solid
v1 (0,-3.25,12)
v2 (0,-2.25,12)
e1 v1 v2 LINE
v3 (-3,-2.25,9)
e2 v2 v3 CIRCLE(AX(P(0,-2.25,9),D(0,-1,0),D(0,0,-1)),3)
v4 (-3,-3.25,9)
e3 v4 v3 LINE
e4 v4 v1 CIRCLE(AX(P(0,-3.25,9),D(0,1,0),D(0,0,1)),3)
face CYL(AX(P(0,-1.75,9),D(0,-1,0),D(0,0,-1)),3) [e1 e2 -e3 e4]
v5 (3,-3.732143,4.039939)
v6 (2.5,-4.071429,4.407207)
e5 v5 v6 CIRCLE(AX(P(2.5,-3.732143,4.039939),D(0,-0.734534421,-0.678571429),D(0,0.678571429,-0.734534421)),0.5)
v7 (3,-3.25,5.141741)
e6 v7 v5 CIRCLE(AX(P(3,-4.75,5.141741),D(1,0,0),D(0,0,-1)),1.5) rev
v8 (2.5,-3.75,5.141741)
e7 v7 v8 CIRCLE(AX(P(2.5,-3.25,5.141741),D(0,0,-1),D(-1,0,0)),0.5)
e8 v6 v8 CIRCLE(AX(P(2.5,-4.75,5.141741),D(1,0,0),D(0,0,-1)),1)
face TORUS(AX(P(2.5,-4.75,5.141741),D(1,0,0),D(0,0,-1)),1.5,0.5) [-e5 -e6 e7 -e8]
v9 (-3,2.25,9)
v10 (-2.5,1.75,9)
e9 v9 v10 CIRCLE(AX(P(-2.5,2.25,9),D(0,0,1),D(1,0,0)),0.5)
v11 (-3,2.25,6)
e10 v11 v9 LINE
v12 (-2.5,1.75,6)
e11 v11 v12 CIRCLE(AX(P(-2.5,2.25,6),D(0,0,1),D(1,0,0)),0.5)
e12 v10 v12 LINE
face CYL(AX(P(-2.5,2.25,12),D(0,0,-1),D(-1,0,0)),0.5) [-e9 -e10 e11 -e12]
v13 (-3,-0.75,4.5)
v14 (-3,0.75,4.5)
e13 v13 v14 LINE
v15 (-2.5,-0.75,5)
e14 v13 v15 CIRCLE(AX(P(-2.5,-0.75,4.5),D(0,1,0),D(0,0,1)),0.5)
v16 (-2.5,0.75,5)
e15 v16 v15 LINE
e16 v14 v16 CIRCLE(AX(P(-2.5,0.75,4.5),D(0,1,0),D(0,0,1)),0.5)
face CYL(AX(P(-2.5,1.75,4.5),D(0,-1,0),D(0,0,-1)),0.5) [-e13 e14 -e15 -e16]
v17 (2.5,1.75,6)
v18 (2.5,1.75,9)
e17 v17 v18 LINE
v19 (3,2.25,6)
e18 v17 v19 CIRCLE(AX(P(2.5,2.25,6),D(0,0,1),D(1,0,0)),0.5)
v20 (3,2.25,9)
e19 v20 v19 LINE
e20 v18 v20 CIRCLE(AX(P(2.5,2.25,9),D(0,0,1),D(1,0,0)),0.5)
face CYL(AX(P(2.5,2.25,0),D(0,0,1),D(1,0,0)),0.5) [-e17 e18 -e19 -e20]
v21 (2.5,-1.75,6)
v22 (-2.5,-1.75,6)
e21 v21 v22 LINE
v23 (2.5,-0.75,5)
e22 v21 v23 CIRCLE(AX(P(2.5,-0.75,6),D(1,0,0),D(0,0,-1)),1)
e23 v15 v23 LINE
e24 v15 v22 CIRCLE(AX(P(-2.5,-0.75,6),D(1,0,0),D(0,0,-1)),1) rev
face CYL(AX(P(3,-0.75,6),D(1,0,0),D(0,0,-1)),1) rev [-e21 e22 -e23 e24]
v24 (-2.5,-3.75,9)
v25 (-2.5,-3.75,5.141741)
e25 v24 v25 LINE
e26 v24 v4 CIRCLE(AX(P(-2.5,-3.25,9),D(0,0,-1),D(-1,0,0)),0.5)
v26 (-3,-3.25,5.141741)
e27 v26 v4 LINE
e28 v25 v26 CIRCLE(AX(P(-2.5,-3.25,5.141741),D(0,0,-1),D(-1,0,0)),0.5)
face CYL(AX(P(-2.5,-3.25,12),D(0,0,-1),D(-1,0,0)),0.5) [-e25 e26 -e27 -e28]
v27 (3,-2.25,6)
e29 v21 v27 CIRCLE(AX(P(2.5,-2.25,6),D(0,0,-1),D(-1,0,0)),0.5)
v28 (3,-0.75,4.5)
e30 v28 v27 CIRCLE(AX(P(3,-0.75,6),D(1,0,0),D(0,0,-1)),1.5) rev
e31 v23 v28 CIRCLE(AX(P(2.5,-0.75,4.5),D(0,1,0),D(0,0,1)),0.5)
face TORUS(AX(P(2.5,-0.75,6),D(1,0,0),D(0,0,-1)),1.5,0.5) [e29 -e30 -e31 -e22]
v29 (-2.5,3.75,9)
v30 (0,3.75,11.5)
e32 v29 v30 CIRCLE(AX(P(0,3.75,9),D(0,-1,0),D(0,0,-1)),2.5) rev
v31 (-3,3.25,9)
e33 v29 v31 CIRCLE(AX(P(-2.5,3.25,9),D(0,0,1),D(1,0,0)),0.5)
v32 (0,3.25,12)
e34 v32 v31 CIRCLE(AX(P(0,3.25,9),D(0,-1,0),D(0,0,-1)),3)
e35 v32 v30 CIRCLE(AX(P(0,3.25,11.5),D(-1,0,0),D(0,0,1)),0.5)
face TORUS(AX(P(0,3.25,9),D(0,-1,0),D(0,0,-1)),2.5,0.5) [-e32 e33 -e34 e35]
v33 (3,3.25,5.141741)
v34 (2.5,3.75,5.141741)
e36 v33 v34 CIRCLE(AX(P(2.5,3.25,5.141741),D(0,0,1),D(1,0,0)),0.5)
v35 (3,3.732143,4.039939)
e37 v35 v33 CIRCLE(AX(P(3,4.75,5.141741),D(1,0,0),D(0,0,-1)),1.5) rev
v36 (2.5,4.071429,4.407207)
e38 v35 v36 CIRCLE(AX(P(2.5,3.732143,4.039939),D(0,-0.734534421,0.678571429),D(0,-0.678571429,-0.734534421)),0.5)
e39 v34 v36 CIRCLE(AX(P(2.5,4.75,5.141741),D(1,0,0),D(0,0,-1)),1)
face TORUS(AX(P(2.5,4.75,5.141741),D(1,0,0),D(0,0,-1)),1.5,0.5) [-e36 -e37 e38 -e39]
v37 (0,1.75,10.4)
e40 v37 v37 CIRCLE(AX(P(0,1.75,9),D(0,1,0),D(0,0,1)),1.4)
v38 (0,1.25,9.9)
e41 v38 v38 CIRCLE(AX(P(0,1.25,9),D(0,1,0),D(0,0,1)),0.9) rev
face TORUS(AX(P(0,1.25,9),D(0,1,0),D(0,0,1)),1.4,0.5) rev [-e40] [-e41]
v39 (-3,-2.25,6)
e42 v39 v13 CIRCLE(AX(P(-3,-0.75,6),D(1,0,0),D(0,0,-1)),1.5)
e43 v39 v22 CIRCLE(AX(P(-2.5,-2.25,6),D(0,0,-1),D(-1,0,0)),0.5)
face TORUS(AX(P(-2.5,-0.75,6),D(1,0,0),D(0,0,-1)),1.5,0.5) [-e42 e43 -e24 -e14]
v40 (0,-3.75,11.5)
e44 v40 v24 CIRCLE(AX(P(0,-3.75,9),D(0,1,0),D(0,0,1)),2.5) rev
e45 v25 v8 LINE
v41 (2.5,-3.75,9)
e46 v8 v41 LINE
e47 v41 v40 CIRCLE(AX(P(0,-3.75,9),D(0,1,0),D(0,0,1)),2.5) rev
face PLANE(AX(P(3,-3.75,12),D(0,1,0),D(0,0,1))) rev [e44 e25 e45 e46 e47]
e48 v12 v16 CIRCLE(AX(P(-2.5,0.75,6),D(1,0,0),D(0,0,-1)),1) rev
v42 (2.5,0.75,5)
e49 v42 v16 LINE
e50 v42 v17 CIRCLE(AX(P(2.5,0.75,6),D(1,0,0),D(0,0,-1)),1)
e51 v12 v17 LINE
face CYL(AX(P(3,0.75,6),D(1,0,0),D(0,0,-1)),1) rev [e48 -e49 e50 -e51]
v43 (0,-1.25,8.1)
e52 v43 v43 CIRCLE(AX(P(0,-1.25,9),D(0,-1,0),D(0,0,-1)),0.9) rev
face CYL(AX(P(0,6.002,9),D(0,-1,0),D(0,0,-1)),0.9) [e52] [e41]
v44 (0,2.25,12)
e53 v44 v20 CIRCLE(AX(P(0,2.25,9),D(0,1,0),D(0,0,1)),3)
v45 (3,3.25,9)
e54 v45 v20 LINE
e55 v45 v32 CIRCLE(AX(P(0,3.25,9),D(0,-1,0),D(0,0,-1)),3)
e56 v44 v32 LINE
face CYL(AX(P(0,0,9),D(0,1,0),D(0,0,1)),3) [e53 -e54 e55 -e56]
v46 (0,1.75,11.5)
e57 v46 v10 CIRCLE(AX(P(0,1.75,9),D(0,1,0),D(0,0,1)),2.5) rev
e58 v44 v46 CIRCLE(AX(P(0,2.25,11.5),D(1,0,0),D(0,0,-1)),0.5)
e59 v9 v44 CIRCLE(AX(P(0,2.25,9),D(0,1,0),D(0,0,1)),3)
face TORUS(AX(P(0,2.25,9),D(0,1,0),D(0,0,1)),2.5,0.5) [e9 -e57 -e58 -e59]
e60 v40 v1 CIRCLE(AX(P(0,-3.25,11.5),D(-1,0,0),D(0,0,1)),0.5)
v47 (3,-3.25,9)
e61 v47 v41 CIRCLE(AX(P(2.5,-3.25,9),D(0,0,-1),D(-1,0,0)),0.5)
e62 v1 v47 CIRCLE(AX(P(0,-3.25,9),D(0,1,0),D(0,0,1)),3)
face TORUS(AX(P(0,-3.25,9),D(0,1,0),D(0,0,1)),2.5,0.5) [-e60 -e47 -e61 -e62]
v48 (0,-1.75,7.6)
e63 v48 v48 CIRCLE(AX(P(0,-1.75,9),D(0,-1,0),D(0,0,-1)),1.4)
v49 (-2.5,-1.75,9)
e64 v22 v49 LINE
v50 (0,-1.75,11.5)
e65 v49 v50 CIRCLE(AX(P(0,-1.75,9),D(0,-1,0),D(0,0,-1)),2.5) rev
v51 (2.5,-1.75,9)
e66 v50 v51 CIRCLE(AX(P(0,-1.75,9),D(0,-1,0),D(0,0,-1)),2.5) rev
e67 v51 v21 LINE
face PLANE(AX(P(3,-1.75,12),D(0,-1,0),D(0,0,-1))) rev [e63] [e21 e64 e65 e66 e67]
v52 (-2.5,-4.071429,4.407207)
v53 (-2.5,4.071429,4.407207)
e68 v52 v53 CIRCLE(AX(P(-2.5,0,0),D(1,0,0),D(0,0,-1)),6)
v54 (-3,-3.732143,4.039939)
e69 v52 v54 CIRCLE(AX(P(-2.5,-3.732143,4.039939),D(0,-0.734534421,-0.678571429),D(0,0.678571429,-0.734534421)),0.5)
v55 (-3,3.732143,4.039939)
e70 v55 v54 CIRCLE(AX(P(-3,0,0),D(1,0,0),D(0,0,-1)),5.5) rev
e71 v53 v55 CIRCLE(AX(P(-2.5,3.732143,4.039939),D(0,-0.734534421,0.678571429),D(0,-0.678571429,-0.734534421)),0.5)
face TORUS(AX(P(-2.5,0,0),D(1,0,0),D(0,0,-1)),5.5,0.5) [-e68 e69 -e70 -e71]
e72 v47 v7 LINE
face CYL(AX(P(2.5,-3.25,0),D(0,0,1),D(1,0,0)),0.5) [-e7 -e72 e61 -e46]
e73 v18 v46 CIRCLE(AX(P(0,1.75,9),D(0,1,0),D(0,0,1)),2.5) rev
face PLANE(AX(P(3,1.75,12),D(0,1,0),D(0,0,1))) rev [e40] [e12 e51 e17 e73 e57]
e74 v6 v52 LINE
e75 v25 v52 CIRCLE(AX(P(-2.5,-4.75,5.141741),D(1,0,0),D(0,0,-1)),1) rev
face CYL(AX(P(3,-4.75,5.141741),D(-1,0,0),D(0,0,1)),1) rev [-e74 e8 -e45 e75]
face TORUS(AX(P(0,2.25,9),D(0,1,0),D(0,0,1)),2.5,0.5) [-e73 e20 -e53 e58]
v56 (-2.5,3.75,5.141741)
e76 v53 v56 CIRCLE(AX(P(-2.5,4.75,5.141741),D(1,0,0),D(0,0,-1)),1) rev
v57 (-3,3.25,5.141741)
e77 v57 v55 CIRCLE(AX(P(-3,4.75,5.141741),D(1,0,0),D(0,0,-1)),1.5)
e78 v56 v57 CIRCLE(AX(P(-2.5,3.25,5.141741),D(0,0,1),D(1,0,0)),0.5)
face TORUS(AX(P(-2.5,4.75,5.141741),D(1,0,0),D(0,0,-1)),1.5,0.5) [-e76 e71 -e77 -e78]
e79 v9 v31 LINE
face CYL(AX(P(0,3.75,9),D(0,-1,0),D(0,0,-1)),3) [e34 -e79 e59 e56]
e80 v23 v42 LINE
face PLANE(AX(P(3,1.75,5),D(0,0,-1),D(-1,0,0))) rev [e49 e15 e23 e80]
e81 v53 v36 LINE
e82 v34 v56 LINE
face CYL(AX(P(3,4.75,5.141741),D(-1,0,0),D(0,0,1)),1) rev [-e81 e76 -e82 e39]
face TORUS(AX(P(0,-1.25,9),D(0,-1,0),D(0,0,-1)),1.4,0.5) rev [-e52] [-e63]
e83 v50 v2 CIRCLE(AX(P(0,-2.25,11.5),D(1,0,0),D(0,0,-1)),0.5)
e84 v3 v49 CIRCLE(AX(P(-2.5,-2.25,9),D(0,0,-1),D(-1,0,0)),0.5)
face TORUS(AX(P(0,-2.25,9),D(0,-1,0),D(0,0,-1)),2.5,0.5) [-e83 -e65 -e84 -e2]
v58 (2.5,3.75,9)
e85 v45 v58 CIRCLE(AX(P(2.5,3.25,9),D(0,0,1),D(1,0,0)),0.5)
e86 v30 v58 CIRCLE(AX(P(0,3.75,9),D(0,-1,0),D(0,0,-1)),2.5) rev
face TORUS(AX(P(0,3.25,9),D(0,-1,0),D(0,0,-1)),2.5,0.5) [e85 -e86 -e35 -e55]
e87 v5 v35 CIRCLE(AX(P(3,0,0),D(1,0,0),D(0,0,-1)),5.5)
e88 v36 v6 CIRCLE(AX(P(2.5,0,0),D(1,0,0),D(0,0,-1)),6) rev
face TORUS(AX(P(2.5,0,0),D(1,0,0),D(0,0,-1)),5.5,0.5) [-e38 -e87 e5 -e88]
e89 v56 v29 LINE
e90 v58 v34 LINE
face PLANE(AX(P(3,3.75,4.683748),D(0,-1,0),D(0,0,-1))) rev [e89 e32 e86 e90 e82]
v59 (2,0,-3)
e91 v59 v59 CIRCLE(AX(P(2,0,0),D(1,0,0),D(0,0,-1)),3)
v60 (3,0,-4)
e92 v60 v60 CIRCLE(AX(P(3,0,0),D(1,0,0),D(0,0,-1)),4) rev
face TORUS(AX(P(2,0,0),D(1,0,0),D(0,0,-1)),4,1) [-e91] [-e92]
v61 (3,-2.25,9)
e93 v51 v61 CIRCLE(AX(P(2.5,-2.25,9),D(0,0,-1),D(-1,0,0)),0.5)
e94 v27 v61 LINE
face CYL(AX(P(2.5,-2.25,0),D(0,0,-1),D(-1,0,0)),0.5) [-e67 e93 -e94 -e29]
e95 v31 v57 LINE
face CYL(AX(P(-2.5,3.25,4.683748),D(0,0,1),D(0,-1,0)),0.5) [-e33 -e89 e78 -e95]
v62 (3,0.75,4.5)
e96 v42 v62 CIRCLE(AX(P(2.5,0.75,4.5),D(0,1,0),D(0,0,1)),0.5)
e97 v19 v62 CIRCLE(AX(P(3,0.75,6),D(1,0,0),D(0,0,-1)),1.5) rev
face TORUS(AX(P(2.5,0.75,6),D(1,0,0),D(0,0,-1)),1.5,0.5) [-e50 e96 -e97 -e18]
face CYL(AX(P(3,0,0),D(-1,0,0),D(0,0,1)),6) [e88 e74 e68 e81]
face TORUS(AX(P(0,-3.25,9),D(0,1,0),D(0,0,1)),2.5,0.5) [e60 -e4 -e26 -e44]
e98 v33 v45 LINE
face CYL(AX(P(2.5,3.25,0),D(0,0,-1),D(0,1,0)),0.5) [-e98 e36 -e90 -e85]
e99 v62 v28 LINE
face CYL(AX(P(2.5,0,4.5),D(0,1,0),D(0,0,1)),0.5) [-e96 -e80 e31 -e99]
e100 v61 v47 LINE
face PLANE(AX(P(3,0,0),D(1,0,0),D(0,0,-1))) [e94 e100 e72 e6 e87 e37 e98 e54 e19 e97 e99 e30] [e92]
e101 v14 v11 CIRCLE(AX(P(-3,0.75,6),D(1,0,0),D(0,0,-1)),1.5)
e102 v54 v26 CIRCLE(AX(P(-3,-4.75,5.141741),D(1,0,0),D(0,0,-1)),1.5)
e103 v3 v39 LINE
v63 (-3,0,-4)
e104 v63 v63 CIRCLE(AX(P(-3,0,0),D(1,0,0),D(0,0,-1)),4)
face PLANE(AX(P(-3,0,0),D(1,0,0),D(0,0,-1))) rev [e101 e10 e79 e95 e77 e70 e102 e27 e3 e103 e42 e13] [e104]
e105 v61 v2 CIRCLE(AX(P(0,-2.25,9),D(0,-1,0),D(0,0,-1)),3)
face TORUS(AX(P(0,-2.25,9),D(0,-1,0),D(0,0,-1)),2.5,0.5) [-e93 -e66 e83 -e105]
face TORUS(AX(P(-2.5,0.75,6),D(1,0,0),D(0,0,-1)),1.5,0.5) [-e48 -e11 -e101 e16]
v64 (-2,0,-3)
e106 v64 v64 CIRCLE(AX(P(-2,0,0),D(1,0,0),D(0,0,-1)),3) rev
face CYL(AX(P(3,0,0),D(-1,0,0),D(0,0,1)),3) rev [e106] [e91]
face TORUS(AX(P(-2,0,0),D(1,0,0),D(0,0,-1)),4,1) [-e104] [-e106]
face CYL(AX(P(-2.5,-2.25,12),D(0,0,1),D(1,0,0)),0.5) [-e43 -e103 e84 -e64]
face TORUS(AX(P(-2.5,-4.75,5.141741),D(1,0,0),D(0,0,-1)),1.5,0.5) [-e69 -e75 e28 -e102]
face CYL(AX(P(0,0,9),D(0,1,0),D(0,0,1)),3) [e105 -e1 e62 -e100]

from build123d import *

# Parameters (mm, degrees)
SKETCH_1_R      = 3
EXTRUDE_1_DEPTH = 3
FILLET_1_R      = 1
EXTRUDE_2_REACH = 16.597
SKETCH_2_R      = 0.9
FILLET_3_R      = 1
FILLET_2_R      = 3
FILLET_4_R      = 0.5
FILLET_5_R      = 0.5


with BuildPart() as part:
    # 草图1 → 凸台-拉伸1 (new, symmetric)
    with BuildSketch(Plane(origin=(0, 0, 0), x_dir=(0, 0, -1), z_dir=(1, 0, 0))):
        with BuildLine():
            Line((-4.683748499, 3.75), (-12, 3.75))
            Line((-12, 3.75), (-12, 1.75))
            Line((-12, 1.75), (-5, 1.75))
            Line((-5, 1.75), (-5, -1.75))
            Line((-5, -1.75), (-12, -1.75))
            Line((-12, -1.75), (-12, -3.75))
            Line((-12, -3.75), (-4.683748499, -3.75))
            ThreePointArc((-4.683748499, -3.75), (6, 0), (-4.683748499, 3.75))
        make_face()
        Circle(SKETCH_1_R, mode=Mode.SUBTRACT)
    extrude(amount=EXTRUDE_1_DEPTH, both=True)

    # 圆角1
    fillet_1_edges = [part.edges().sort_by_distance(p)[0] for p in [
        (0, -3.75, 4.683748499),
        (0, -1.75, 5),
        (0, 1.75, 5),
        (0, 3.75, 4.683748499),
    ]]
    fillet(fillet_1_edges, radius=FILLET_1_R)

    # 草图2 → 凸台-拉伸2 (add, up to next)
    with BuildSketch(Plane(origin=(0, -1.75, 0), x_dir=(1, 0, 0), z_dir=(0, 1, 0)), mode=Mode.PRIVATE) as extrude_2_sk1:
        with Locations(Location((0, -9, 0), (0, 0, 90))):
            Circle(SKETCH_2_R)
    extrude_2_tool1 = extrude(extrude_2_sk1.sketch, amount=EXTRUDE_2_REACH, mode=Mode.PRIVATE) - part.part
    add(extrude_2_tool1.solids().sort_by_distance((0, -1.75, 9))[0])

    # 圆角3
    fillet_3_edges = [part.edges().sort_by_distance(p)[0] for p in [
        (-3, 0, 3),
        (3, 0, 3),
    ]]
    fillet(fillet_3_edges, radius=FILLET_3_R)

    # 圆角2
    fillet_2_edges = [part.edges().sort_by_distance(p)[0] for p in [
        (-3, -2.75, 12),
        (-3, 2.75, 12),
        (3, -2.75, 12),
        (3, 2.75, 12),
    ]]
    fillet(fillet_2_edges, radius=FILLET_2_R - 0.0001)  # a hair under: the kernel refuses the full size

    # 圆角4
    fillet_4_edges = [part.edges().sort_by_distance(p)[0] for p in [
        (0, -1.75, 9.9),
        (0, 1.75, 9.9),
    ]]
    fillet(fillet_4_edges, radius=FILLET_4_R)

    # 圆角5
    fillet_5_edges = [part.edges().sort_by_distance(p)[0] for p in [
        (-3, 3.75, 7.070920475),
        (3, 3.75, 7.070920475),
        (-3, 0, -6),
        (3, 0, -6),
        (-3, -1.75, 7.50005),
        (3, -1.75, 7.50005),
        (-3, 0, 5),
        (3, 0, 5),
        (-3, 3.833874619, 4.740849087),
        (3, 3.833874619, 4.740849087),
        (-3, -1.457106781, 5.292893219),
        (3, -1.457106781, 5.292893219),
        (-3, -3.833874619, 4.740849087),
        (3, -3.833874619, 4.740849087),
        (-3, 1.457106781, 5.292893219),
        (3, 1.457106781, 5.292893219),
        (-3, -3.75, 7.070920475),
        (3, -3.75, 7.070920475),
        (2.121349633, -3.75, 11.121349633),
        (-2.121349633, -3.75, 11.121349633),
        (-3, 1.75, 7.50005),
        (2.121349633, -1.75, 11.121349633),
        (-2.121349633, -1.75, 11.121349633),
        (3, 1.75, 7.50005),
        (2.121349633, 1.75, 11.121349633),
        (-2.121349633, 1.75, 11.121349633),
        (2.121349633, 3.75, 11.121349633),
        (-2.121349633, 3.75, 11.121349633),
    ]]
    fillet(fillet_5_edges, radius=FILLET_5_R)


solid = part.part
